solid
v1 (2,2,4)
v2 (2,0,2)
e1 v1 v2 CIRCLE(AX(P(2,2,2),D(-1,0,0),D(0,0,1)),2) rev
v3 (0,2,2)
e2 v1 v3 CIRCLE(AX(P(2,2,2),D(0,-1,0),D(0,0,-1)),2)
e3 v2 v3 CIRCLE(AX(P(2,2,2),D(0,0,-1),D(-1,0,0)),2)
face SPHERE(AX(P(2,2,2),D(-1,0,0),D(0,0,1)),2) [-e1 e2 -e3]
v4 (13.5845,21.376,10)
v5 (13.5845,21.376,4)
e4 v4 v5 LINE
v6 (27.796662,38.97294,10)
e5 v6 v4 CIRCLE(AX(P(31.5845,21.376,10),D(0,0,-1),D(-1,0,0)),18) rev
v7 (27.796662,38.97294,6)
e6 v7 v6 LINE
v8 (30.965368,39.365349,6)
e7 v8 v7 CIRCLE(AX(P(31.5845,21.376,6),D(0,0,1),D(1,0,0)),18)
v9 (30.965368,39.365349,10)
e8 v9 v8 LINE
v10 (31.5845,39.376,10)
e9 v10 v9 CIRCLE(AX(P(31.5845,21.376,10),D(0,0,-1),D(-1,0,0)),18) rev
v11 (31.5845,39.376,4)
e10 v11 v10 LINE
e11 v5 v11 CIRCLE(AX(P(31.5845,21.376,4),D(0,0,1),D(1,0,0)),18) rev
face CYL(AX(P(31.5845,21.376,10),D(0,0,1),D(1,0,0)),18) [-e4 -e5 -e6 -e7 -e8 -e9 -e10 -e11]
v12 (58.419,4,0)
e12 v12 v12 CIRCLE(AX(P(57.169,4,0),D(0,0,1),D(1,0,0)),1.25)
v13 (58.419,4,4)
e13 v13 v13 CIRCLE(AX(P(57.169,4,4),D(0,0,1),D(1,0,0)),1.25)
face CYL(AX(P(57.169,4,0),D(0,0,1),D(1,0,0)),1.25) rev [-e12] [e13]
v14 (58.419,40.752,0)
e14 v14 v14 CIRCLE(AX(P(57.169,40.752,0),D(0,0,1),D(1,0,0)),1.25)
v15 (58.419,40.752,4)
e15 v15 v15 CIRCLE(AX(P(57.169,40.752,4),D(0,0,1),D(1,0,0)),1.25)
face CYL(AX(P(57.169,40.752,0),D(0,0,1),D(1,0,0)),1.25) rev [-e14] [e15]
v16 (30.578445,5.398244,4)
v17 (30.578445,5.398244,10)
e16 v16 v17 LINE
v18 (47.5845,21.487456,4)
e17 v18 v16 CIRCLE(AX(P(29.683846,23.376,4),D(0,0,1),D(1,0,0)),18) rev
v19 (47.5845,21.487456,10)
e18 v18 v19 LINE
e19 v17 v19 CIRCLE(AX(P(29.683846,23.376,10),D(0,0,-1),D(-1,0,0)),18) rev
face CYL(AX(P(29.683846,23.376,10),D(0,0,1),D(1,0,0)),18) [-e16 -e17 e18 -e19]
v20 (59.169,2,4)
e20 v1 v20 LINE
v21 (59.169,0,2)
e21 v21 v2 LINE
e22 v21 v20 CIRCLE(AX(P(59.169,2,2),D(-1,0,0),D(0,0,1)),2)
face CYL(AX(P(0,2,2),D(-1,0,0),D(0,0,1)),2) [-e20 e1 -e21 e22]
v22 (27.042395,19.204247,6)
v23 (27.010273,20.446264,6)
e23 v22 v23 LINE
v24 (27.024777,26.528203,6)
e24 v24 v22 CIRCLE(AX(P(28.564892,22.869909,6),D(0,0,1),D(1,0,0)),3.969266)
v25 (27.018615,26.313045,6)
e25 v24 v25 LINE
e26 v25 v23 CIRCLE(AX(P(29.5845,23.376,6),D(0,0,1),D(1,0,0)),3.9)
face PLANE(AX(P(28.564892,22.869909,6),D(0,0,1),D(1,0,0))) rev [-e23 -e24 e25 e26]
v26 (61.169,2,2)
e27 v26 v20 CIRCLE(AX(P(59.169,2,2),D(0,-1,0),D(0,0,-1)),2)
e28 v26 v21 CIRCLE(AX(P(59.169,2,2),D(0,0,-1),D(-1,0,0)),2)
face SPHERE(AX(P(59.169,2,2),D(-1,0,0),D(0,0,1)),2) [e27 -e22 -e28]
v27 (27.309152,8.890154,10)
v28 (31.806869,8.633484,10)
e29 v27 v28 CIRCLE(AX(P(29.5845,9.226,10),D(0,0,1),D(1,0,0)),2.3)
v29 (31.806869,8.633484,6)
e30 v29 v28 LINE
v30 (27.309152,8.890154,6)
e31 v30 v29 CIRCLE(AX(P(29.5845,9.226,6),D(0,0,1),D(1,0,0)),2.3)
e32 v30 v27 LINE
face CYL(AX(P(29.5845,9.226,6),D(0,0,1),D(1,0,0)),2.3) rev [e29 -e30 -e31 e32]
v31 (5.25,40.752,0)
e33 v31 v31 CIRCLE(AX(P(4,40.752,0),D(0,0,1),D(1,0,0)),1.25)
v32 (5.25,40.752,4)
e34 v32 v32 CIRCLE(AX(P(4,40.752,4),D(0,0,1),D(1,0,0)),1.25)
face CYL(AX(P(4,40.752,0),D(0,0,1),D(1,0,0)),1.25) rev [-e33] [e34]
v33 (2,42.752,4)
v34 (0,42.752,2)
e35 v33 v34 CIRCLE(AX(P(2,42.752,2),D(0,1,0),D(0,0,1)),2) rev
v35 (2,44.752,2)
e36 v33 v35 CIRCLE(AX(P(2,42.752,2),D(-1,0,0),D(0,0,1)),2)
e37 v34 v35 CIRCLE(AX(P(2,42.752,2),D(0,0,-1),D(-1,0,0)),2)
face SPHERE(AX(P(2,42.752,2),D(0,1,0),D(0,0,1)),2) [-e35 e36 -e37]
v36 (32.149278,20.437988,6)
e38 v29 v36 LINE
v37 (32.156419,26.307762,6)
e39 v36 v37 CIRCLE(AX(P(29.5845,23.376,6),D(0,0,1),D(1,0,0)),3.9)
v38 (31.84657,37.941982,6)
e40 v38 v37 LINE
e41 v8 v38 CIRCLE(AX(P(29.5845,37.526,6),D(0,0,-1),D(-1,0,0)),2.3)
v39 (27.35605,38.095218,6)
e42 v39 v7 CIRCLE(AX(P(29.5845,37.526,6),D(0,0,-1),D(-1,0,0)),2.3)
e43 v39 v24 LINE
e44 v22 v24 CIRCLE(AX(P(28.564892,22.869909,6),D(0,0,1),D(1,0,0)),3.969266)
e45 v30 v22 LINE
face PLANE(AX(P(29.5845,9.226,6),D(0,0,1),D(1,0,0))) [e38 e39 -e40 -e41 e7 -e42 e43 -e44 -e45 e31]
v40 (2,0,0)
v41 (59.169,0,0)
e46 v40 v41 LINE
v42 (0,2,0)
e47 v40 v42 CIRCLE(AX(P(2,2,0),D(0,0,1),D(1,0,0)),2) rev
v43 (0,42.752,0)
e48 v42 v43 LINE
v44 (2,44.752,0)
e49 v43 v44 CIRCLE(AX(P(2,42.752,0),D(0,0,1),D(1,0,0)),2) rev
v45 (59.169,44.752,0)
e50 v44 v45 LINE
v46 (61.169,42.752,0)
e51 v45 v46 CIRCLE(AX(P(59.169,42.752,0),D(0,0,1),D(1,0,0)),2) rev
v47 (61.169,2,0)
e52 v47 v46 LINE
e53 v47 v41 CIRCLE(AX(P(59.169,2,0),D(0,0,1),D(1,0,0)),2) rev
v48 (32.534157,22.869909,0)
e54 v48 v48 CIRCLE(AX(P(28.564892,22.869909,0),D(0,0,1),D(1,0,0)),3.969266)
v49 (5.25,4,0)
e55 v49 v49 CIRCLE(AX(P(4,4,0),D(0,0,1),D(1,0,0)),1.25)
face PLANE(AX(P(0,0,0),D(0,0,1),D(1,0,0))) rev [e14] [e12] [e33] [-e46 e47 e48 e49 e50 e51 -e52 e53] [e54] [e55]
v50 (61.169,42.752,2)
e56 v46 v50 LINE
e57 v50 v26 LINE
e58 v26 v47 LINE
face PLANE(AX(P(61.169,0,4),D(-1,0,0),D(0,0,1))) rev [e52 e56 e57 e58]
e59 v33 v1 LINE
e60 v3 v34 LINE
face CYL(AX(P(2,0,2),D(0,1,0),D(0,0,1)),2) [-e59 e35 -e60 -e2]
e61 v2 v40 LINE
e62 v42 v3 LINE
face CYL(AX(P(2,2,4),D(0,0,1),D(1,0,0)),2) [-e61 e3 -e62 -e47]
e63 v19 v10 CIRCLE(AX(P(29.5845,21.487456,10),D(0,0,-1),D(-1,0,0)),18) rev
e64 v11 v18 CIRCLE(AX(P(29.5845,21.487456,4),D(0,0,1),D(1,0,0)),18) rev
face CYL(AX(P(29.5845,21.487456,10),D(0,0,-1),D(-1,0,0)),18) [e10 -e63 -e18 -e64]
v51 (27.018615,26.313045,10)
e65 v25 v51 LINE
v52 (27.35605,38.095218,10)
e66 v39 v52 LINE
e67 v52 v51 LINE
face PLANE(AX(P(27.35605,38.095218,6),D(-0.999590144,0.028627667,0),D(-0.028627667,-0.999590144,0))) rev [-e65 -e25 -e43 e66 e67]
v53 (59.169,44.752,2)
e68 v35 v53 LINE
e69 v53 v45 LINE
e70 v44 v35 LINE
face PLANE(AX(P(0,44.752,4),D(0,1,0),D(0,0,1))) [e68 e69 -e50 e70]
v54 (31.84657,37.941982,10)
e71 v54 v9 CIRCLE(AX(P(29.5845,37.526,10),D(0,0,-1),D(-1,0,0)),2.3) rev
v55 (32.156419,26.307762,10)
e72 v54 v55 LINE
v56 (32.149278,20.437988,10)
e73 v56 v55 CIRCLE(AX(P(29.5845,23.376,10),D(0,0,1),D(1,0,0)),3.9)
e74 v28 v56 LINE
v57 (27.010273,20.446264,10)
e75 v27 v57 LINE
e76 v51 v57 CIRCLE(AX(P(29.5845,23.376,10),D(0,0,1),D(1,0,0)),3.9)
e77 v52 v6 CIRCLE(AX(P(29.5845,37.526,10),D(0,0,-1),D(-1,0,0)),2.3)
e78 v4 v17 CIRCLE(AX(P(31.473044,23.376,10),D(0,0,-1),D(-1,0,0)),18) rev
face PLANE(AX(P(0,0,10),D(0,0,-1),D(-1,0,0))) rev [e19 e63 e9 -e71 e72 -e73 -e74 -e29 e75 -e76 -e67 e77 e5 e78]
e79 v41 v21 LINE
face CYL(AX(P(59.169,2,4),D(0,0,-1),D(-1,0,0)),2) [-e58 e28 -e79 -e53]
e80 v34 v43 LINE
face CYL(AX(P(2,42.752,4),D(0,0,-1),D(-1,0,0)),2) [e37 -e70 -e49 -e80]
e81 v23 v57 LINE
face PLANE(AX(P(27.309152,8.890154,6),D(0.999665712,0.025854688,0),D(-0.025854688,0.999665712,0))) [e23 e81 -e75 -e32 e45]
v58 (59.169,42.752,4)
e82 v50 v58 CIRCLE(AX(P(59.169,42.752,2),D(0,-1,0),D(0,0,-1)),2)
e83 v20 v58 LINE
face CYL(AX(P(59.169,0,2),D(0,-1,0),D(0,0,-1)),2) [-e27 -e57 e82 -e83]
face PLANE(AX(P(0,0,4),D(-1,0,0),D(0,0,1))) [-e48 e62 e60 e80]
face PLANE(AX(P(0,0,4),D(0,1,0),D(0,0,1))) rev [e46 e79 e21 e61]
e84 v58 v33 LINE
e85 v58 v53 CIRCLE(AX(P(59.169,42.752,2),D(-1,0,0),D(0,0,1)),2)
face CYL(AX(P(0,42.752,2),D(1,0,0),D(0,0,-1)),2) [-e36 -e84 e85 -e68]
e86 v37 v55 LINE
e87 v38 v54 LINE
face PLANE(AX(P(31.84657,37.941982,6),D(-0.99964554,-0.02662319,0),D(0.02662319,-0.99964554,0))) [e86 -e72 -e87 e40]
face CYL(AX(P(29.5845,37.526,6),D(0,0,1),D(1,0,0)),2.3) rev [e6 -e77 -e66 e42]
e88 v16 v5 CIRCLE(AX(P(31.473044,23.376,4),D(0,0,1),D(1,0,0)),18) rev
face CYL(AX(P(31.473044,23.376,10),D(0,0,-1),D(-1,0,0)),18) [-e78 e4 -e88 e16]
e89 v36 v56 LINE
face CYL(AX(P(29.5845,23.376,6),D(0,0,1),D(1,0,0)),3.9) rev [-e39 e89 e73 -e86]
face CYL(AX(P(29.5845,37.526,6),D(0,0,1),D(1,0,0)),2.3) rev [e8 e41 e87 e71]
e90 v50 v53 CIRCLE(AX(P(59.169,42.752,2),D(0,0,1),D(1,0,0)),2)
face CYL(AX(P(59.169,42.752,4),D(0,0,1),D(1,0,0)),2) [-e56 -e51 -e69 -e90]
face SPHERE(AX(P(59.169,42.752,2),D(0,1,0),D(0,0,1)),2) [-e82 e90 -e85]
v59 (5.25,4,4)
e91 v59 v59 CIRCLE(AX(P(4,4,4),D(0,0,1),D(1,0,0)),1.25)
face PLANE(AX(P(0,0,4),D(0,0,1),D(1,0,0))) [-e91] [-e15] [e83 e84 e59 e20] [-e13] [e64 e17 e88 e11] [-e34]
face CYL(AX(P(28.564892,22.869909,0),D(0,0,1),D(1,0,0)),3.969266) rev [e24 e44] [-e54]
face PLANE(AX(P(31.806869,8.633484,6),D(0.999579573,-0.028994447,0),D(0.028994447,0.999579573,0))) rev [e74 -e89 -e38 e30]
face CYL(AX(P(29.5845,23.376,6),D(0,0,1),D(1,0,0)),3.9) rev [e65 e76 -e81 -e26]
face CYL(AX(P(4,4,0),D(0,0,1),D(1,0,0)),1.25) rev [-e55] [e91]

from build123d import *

# Parameters (mm, degrees)
SKETCH1_W           = 61.169
SKETCH1_H           = 44.752
BOSS_EXTRUDE1_DEPTH = 4
SKETCH2_W           = 34
SKETCH2_H           = 34
BOSS_EXTRUDE2_DEPTH = 6
CUT_EXTRUDE1_DEPTH  = 4
SKETCH4_R           = 3.969265512
CUT_EXTRUDE2_DEPTH  = 77.028863368
FILLET1_R           = 18
FILLET2_R           = 18
FILLET3_R           = 18
FILLET4_START       = 4
FILLET4_DEPTH       = 6
SKETCH5_R           = 1.25
CUT_EXTRUDE3_DEPTH  = 77.028863368
FILLET5_R           = 2
FILLET6_R           = 2
FILLET7_R           = 2
FILLET8_R           = 2


with BuildPart() as part:
    # Sketch1 → Boss-Extrude1 (new body)
    with BuildSketch(Plane.XY):
        with Locations((30.5845, 22.376)):
            Rectangle(SKETCH1_W, SKETCH1_H)
    extrude(amount=BOSS_EXTRUDE1_DEPTH)

    # Sketch2 → Boss-Extrude2 (add)
    with BuildSketch(Plane.XY.offset(4)):
        with Locations((30.5845, 22.376)):
            Rectangle(SKETCH2_W, SKETCH2_H)
    extrude(amount=BOSS_EXTRUDE2_DEPTH)

    # Sketch3 → Cut-Extrude1 (cut)
    with BuildSketch(Plane.XY.offset(10)):
        with BuildLine():
            Line((27.356049636, 38.095217862), (27.01861523, 26.313045343))
            ThreePointArc((27.01861523, 26.313045343), (25.684503943, 23.381545743), (27.010272743, 20.446263829))
            Line((27.010272743, 20.446263829), (27.309152271, 8.890153737))
            ThreePointArc((27.309152271, 8.890153737), (29.453459694, 6.929735982), (31.806869101, 8.633483691))
            Line((31.806869101, 8.633483691), (32.149278144, 20.437988245))
            ThreePointArc((32.149278144, 20.437988245), (33.484497114, 23.371255165), (32.156419459, 26.307762319))
            Line((32.156419459, 26.307762319), (31.846569585, 37.941982205))
            ThreePointArc((31.846569585, 37.941982205), (29.662940134, 39.824662034), (27.356049636, 38.095217862))
        make_face()
    extrude(amount=-CUT_EXTRUDE1_DEPTH, mode=Mode.SUBTRACT)

    # Sketch4 → Cut-Extrude2 (cut, through all)
    with BuildSketch(Plane.XY.offset(6)):
        with Locations((28.564891977, 22.86990875)):
            Circle(SKETCH4_R)
    extrude(amount=-CUT_EXTRUDE2_DEPTH, mode=Mode.SUBTRACT)

    # Fillet1
    # the kernel refuses this fillet: 18 mm, written as the material it takes off along each edge
    with BuildSketch(Plane(origin=(13.5845, 39.376, 4), x_dir=(0, -1, 0), z_dir=(0, 0, 1))) as fillet1_piece_1:
        with BuildLine():
            CenterArc((FILLET1_R, FILLET1_R), FILLET1_R, 180, 90)
            Line((0, FILLET1_R), (0, 0))
            Line((0, 0), (FILLET1_R, 0))
        make_face()
    extrude(amount=51, mode=Mode.SUBTRACT)

    # Fillet2
    # the kernel refuses this fillet: 18 mm, written as the material it takes off along each edge
    with BuildSketch(Plane(origin=(47.5845, 39.376, 4), x_dir=(0, -1, 0), z_dir=(0, 0, 1))) as fillet2_piece_1:
        with BuildLine():
            CenterArc((17.88854382, -18), FILLET2_R, 90, 83.620629792)
            Line((0, -16), (0, 0))
            Line((0, 0), (17.88854382, 0))
        make_face()
    extrude(amount=50.72135955, mode=Mode.SUBTRACT)

    # Fillet3
    # the kernel refuses this fillet: 18 mm, written as the material it takes off along each edge
    with BuildSketch(Plane(origin=(13.5845, 5.376, 4), x_dir=(0, 1, 0), z_dir=(0, 0, 1))) as fillet3_piece_1:
        with BuildLine():
            CenterArc((18, -17.88854382), FILLET3_R, 96.379370208, 83.620629792)
            Line((0, -17.88854382), (0, 0))
            Line((0, 0), (16, 0))
        make_face()
    extrude(amount=50.72135955, mode=Mode.SUBTRACT)

    # Fillet4: read off the stored shape, not the designer's step
    # Fillet4 outline → Fillet4 (cut)
    with BuildSketch(Plane.XY.offset(FILLET4_START)):
        with BuildLine():
            ThreePointArc((47.5845, 21.48745618), (42.054418725, 10.300490896), (30.578445069, 5.398244493))
            ThreePointArc((30.578445069, 5.398244493), (31.025606187, 5.381561983), (31.47304382, 5.376))
            Line((31.47304382, 5.376), (47.5845, 5.376))
            Line((47.5845, 5.376), (47.5845, 21.48745618))
        make_face()
    extrude(amount=FILLET4_DEPTH, mode=Mode.SUBTRACT)

    # Sketch5 → Cut-Extrude3 (cut, through all)
    with BuildSketch(Plane.XY.offset(4)):
        with Locations((4, 40.752)):
            Circle(SKETCH5_R)
        with Locations((57.169, 40.752)):
            Circle(SKETCH5_R)
        with Locations((4, 4)):
            Circle(SKETCH5_R)
        with Locations((57.169, 4)):
            Circle(SKETCH5_R)
    extrude(amount=-CUT_EXTRUDE3_DEPTH, mode=Mode.SUBTRACT)

    # Fillet5
    fillet5_edges = [part.edges().sort_by_distance(p)[0] for p in [
        (30.5845, 0, 4),
    ]]
    fillet(fillet5_edges, radius=FILLET5_R)

    # Fillet6
    fillet6_edges = [part.edges().sort_by_distance(p)[0] for p in [
        (61.169, 23.376, 4),
        (61.169, 0, 1),
        (61.169, 0.585786438, 3.414213562),
    ]]
    fillet(fillet6_edges, radius=FILLET6_R)

    # Fillet7
    fillet7_edges = [part.edges().sort_by_distance(p)[0] for p in [
        (0, 23.376, 4),
        (0, 0, 1),
        (0, 0.585786438, 3.414213562),
    ]]
    fillet(fillet7_edges, radius=FILLET7_R)

    # Fillet8
    fillet8_edges = [part.edges().sort_by_distance(p)[0] for p in [
        (61.169, 44.752, 1),
        (60.583213562, 44.752, 3.414213562),
        (0, 44.752, 1),
        (30.5845, 44.752, 4),
        (0.585786438, 44.752, 3.414213562),
    ]]
    fillet(fillet8_edges, radius=FILLET8_R)


solid = part.part
